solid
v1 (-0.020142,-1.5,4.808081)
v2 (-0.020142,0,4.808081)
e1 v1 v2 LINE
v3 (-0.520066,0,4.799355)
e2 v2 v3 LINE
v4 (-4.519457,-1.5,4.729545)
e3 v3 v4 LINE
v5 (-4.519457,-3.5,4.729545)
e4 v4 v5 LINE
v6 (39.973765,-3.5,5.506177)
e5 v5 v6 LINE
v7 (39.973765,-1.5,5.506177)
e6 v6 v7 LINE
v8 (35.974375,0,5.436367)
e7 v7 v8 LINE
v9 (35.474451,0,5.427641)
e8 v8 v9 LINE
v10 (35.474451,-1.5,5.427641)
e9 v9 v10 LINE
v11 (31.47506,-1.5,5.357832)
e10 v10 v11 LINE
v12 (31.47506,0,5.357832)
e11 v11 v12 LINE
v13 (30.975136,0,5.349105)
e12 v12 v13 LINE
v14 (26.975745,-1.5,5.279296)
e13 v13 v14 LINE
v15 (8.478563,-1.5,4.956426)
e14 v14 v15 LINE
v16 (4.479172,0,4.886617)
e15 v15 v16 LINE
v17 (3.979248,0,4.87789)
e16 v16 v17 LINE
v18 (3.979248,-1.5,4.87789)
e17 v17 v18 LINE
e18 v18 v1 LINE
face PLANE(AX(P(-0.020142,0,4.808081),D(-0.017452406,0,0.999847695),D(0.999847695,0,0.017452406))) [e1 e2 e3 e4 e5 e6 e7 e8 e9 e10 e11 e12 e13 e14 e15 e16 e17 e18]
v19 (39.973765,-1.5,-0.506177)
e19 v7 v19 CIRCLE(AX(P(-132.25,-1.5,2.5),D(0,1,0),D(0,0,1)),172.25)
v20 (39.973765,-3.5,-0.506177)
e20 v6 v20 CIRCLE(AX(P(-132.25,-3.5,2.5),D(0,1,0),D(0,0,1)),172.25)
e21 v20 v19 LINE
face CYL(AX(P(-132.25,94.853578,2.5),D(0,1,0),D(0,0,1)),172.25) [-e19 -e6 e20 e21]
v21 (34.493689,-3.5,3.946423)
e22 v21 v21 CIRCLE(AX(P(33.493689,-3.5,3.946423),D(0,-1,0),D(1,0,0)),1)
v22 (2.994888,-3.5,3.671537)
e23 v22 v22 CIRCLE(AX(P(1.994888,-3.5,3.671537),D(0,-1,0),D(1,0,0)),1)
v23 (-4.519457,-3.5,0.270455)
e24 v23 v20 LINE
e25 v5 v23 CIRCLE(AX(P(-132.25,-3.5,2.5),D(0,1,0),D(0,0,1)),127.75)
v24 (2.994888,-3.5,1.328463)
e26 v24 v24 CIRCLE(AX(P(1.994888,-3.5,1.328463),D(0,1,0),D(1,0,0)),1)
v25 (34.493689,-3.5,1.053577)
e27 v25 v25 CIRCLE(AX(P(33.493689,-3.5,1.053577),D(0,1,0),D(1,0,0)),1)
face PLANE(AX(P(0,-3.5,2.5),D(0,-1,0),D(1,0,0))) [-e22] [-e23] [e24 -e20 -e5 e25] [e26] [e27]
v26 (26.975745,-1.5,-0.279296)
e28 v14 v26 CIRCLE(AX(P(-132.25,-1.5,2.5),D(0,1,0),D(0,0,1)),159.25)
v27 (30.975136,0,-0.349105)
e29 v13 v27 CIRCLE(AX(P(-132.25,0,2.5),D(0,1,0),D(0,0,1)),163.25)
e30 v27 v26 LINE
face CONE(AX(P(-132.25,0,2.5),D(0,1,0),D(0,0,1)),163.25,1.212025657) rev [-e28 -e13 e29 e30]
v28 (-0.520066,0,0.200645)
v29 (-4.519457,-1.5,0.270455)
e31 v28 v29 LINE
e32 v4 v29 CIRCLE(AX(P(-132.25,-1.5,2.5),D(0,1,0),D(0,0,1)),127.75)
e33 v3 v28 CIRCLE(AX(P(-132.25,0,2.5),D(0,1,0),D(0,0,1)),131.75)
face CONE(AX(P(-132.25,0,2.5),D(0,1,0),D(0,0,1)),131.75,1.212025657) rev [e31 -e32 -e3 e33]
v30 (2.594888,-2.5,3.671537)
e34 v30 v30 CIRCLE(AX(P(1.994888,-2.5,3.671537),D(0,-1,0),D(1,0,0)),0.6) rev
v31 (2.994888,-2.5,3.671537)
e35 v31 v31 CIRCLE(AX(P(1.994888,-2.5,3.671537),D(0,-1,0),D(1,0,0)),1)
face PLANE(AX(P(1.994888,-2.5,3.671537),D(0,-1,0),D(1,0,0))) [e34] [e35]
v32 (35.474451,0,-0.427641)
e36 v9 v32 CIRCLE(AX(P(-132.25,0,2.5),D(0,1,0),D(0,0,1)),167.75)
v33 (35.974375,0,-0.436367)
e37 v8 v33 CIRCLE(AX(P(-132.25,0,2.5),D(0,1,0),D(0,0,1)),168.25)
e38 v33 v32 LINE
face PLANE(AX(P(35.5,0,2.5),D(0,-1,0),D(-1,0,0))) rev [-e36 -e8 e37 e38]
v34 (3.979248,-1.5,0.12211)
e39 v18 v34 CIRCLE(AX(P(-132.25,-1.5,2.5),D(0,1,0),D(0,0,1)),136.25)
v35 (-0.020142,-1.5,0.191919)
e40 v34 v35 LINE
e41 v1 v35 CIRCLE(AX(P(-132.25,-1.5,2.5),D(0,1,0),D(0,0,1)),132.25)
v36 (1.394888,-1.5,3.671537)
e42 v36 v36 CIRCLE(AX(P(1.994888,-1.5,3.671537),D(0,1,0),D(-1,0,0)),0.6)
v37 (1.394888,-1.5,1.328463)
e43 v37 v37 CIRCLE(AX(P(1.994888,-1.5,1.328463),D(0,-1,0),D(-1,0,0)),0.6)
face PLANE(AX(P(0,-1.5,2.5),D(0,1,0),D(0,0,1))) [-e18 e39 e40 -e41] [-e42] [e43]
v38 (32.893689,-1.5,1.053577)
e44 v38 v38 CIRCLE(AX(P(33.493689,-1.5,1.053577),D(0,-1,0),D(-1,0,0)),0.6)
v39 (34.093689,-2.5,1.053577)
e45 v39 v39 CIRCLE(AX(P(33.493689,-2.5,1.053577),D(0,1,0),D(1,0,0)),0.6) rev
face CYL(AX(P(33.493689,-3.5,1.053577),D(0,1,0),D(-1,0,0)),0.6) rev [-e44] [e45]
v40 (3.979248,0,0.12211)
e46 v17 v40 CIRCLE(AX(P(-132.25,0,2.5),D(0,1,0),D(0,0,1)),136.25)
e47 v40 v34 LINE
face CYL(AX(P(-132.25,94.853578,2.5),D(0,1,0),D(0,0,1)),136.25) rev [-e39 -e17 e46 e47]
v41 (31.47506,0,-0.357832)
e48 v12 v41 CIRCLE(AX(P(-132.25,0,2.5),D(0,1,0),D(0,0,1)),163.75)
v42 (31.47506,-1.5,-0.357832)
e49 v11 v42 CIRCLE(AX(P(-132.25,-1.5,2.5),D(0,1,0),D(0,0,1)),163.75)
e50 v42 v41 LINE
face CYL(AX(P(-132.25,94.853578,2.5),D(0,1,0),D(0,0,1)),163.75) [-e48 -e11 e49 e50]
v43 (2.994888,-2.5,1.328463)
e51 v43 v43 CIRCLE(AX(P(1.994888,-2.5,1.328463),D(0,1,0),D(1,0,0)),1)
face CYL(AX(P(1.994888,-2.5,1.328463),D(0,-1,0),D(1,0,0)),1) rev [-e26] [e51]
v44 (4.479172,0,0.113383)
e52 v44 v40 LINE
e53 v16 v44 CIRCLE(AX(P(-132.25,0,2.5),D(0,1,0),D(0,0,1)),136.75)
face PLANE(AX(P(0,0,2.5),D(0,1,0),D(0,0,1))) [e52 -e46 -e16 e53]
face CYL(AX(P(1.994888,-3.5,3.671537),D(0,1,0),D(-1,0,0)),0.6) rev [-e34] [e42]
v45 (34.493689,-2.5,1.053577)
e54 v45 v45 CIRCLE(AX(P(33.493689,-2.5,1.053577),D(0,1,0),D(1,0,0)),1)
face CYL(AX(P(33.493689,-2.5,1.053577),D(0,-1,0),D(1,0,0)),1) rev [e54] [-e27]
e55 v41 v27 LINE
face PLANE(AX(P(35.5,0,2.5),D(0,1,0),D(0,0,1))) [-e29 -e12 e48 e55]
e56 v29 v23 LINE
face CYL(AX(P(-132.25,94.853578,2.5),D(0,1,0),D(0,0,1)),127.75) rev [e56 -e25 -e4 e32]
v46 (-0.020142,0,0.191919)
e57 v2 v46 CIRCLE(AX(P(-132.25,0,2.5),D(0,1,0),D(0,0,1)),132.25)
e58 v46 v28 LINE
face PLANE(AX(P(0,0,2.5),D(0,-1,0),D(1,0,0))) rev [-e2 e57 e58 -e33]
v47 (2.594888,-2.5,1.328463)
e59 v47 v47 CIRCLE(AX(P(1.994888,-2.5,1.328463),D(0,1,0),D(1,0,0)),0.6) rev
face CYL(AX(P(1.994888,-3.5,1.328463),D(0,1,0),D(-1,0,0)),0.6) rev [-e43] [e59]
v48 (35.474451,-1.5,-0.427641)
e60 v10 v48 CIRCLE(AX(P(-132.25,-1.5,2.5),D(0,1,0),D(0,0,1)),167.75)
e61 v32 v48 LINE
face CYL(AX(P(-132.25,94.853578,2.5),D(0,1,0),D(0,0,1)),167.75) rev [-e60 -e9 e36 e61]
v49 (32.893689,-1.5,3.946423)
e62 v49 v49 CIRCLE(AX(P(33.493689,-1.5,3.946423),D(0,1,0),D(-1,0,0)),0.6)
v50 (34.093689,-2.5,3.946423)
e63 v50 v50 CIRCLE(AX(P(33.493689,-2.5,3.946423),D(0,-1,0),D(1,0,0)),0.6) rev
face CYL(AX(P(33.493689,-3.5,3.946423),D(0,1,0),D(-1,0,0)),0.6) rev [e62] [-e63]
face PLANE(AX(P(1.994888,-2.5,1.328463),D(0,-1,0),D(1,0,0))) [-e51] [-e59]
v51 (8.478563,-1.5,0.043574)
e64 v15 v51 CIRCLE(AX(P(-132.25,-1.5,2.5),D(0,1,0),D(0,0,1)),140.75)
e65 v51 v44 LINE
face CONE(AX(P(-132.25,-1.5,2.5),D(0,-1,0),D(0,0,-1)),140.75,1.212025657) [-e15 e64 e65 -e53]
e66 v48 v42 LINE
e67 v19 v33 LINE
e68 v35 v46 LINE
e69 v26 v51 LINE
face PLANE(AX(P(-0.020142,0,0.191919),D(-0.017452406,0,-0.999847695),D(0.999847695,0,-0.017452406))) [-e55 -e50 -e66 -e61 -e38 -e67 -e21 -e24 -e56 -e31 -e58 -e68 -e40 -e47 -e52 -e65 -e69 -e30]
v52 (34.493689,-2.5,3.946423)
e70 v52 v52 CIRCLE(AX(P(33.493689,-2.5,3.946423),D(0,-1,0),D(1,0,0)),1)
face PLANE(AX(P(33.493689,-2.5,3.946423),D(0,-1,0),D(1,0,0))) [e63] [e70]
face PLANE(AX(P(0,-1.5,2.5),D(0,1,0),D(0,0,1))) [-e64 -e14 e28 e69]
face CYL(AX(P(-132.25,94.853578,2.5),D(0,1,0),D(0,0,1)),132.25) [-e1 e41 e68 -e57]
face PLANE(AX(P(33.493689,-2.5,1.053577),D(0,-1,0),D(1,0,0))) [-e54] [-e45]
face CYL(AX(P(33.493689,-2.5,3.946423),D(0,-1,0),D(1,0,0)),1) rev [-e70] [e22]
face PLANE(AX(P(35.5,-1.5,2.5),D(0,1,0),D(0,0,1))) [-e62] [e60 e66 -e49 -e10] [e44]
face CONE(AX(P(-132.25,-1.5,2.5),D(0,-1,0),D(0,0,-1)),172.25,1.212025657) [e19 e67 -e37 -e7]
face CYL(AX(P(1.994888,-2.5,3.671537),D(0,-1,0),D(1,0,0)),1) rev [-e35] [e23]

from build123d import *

# Parameters (mm, degrees)
EXTRUDE_1_DEPTH     = 2.5
SKETCH_5_R          = 0.6
CUT_EXTRUDE_1_DEPTH = 19.036421485
CUT_EXTRUDE_START   = -2
SKETCH_5_3_R        = 1
CUT_EXTRUDE_2_DEPTH = 1
REVOLVE_1_ANGLE     = 1
SKETCH_9_R          = 0.6
CUT_EXTRUDE_3_DEPTH = 41.426698916
SKETCH_9_3_R        = 1
CUT_EXTRUDE_4_DEPTH = 1
SKETCH_10_W         = 44.5
SKETCH_10_H         = 2.5
CUT_EXTRUDE_5_DEPTH = 41.528606999


with BuildPart() as part:
    # 草图4 → 凸台-拉伸1 (new body)
    with BuildSketch(Plane.XY):
        Polygon((8.5, -1.5), (17.75, -1.5), (17.75, -3.5), (-4.5, -3.5), (-4.5, -1.5), (-0.5, 0), (0, 0), (0, -1.5), (4, -1.5), (4, 0), (4.5, 0), align=None)
    extrude(amount=EXTRUDE_1_DEPTH)

    # 草图5 → 切除-拉伸1 (cut, through all)
    with BuildSketch(Plane(origin=(0, -1.5, 0), x_dir=(1, 0, 0), z_dir=(0, 1, 0))):
        with Locations(Location((2, -1.25, 0), (0, 0, 270))):
            Circle(SKETCH_5_R)
    extrude(amount=-CUT_EXTRUDE_1_DEPTH, mode=Mode.SUBTRACT)

    # 草图5<3> → 切除-拉伸2 (cut)
    with BuildSketch(Plane(origin=(0, -1.5, 0), x_dir=(1, 0, 0), z_dir=(0, 1, 0)).offset(CUT_EXTRUDE_START)):
        with Locations((2, -1.25)):
            Circle(SKETCH_5_3_R)
    extrude(amount=CUT_EXTRUDE_2_DEPTH, mode=Mode.SUBTRACT)

    # 镜向1: part across plane


with BuildPart() as part_1:
    add(part.part)
    add(part.part.mirror(Plane(origin=(17.75, 0, 2.5), x_dir=(0, 0, 1), z_dir=(1, 0, 0))))

    # 草图6 → 旋转1 (revolve)
    with BuildSketch(Plane.XY.offset(2.5)):
        Polygon((0, 0), (-0.5, 0), (-4.5, -1.5), (-4.5, -3.5), (40, -3.5), (40, -1.5), (36, 0), (35.5, 0), (35.5, -1.5), (31.5, -1.5), (31.5, 0), (31, 0), (27, -1.5), (8.5, -1.5), (4.5, 0), (4, 0), (4, -1.5), (0, -1.5), align=None)
    revolve(axis=Axis((-132.25, 94.8535776, 2.5), (0, -1, 0)), revolution_arc=REVOLVE_1_ANGLE)

    # 草图9 → 切除-拉伸3 (cut, through all)
    with BuildSketch(Plane(origin=(0, -1.5, 0), x_dir=(1, 0, 0), z_dir=(0, 1, 0))):
        with Locations(Location((1.994888171, -3.671537391, 0), (0, 0, 180))):
            Circle(SKETCH_9_R)
        with Locations(Location((33.493688748, -3.946423259, 0), (0, 0, 180))):
            Circle(SKETCH_9_R)
    extrude(amount=-CUT_EXTRUDE_3_DEPTH, mode=Mode.SUBTRACT)

    # 草图9<3> → 切除-拉伸4 (cut)
    with BuildSketch(Plane(origin=(0, -1.5, 0), x_dir=(1, 0, 0), z_dir=(0, 1, 0)).offset(CUT_EXTRUDE_START)):
        with Locations((1.994888171, -3.671537391)):
            Circle(SKETCH_9_3_R)
        with Locations((33.493688748, -3.946423259)):
            Circle(SKETCH_9_3_R)
    extrude(amount=CUT_EXTRUDE_4_DEPTH, mode=Mode.SUBTRACT)

    # 草图10 → 切除-拉伸5 (cut, through all)
    with BuildSketch(Plane(origin=(0, 0, 0), x_dir=(1, 0, 0), z_dir=(0, 1, 0))):
        with Locations((17.75, -1.25)):
            Rectangle(SKETCH_10_W, SKETCH_10_H)
    extrude(amount=-CUT_EXTRUDE_5_DEPTH, mode=Mode.SUBTRACT)

    # 镜向2: part across plane


with BuildPart() as part_2:
    add(part_1.part)
    add(part_1.part.mirror(Plane(origin=(40, -3.5, 2.5), x_dir=(1, 0, 0), z_dir=(0, 0, 1))))


solid = part_2.part
